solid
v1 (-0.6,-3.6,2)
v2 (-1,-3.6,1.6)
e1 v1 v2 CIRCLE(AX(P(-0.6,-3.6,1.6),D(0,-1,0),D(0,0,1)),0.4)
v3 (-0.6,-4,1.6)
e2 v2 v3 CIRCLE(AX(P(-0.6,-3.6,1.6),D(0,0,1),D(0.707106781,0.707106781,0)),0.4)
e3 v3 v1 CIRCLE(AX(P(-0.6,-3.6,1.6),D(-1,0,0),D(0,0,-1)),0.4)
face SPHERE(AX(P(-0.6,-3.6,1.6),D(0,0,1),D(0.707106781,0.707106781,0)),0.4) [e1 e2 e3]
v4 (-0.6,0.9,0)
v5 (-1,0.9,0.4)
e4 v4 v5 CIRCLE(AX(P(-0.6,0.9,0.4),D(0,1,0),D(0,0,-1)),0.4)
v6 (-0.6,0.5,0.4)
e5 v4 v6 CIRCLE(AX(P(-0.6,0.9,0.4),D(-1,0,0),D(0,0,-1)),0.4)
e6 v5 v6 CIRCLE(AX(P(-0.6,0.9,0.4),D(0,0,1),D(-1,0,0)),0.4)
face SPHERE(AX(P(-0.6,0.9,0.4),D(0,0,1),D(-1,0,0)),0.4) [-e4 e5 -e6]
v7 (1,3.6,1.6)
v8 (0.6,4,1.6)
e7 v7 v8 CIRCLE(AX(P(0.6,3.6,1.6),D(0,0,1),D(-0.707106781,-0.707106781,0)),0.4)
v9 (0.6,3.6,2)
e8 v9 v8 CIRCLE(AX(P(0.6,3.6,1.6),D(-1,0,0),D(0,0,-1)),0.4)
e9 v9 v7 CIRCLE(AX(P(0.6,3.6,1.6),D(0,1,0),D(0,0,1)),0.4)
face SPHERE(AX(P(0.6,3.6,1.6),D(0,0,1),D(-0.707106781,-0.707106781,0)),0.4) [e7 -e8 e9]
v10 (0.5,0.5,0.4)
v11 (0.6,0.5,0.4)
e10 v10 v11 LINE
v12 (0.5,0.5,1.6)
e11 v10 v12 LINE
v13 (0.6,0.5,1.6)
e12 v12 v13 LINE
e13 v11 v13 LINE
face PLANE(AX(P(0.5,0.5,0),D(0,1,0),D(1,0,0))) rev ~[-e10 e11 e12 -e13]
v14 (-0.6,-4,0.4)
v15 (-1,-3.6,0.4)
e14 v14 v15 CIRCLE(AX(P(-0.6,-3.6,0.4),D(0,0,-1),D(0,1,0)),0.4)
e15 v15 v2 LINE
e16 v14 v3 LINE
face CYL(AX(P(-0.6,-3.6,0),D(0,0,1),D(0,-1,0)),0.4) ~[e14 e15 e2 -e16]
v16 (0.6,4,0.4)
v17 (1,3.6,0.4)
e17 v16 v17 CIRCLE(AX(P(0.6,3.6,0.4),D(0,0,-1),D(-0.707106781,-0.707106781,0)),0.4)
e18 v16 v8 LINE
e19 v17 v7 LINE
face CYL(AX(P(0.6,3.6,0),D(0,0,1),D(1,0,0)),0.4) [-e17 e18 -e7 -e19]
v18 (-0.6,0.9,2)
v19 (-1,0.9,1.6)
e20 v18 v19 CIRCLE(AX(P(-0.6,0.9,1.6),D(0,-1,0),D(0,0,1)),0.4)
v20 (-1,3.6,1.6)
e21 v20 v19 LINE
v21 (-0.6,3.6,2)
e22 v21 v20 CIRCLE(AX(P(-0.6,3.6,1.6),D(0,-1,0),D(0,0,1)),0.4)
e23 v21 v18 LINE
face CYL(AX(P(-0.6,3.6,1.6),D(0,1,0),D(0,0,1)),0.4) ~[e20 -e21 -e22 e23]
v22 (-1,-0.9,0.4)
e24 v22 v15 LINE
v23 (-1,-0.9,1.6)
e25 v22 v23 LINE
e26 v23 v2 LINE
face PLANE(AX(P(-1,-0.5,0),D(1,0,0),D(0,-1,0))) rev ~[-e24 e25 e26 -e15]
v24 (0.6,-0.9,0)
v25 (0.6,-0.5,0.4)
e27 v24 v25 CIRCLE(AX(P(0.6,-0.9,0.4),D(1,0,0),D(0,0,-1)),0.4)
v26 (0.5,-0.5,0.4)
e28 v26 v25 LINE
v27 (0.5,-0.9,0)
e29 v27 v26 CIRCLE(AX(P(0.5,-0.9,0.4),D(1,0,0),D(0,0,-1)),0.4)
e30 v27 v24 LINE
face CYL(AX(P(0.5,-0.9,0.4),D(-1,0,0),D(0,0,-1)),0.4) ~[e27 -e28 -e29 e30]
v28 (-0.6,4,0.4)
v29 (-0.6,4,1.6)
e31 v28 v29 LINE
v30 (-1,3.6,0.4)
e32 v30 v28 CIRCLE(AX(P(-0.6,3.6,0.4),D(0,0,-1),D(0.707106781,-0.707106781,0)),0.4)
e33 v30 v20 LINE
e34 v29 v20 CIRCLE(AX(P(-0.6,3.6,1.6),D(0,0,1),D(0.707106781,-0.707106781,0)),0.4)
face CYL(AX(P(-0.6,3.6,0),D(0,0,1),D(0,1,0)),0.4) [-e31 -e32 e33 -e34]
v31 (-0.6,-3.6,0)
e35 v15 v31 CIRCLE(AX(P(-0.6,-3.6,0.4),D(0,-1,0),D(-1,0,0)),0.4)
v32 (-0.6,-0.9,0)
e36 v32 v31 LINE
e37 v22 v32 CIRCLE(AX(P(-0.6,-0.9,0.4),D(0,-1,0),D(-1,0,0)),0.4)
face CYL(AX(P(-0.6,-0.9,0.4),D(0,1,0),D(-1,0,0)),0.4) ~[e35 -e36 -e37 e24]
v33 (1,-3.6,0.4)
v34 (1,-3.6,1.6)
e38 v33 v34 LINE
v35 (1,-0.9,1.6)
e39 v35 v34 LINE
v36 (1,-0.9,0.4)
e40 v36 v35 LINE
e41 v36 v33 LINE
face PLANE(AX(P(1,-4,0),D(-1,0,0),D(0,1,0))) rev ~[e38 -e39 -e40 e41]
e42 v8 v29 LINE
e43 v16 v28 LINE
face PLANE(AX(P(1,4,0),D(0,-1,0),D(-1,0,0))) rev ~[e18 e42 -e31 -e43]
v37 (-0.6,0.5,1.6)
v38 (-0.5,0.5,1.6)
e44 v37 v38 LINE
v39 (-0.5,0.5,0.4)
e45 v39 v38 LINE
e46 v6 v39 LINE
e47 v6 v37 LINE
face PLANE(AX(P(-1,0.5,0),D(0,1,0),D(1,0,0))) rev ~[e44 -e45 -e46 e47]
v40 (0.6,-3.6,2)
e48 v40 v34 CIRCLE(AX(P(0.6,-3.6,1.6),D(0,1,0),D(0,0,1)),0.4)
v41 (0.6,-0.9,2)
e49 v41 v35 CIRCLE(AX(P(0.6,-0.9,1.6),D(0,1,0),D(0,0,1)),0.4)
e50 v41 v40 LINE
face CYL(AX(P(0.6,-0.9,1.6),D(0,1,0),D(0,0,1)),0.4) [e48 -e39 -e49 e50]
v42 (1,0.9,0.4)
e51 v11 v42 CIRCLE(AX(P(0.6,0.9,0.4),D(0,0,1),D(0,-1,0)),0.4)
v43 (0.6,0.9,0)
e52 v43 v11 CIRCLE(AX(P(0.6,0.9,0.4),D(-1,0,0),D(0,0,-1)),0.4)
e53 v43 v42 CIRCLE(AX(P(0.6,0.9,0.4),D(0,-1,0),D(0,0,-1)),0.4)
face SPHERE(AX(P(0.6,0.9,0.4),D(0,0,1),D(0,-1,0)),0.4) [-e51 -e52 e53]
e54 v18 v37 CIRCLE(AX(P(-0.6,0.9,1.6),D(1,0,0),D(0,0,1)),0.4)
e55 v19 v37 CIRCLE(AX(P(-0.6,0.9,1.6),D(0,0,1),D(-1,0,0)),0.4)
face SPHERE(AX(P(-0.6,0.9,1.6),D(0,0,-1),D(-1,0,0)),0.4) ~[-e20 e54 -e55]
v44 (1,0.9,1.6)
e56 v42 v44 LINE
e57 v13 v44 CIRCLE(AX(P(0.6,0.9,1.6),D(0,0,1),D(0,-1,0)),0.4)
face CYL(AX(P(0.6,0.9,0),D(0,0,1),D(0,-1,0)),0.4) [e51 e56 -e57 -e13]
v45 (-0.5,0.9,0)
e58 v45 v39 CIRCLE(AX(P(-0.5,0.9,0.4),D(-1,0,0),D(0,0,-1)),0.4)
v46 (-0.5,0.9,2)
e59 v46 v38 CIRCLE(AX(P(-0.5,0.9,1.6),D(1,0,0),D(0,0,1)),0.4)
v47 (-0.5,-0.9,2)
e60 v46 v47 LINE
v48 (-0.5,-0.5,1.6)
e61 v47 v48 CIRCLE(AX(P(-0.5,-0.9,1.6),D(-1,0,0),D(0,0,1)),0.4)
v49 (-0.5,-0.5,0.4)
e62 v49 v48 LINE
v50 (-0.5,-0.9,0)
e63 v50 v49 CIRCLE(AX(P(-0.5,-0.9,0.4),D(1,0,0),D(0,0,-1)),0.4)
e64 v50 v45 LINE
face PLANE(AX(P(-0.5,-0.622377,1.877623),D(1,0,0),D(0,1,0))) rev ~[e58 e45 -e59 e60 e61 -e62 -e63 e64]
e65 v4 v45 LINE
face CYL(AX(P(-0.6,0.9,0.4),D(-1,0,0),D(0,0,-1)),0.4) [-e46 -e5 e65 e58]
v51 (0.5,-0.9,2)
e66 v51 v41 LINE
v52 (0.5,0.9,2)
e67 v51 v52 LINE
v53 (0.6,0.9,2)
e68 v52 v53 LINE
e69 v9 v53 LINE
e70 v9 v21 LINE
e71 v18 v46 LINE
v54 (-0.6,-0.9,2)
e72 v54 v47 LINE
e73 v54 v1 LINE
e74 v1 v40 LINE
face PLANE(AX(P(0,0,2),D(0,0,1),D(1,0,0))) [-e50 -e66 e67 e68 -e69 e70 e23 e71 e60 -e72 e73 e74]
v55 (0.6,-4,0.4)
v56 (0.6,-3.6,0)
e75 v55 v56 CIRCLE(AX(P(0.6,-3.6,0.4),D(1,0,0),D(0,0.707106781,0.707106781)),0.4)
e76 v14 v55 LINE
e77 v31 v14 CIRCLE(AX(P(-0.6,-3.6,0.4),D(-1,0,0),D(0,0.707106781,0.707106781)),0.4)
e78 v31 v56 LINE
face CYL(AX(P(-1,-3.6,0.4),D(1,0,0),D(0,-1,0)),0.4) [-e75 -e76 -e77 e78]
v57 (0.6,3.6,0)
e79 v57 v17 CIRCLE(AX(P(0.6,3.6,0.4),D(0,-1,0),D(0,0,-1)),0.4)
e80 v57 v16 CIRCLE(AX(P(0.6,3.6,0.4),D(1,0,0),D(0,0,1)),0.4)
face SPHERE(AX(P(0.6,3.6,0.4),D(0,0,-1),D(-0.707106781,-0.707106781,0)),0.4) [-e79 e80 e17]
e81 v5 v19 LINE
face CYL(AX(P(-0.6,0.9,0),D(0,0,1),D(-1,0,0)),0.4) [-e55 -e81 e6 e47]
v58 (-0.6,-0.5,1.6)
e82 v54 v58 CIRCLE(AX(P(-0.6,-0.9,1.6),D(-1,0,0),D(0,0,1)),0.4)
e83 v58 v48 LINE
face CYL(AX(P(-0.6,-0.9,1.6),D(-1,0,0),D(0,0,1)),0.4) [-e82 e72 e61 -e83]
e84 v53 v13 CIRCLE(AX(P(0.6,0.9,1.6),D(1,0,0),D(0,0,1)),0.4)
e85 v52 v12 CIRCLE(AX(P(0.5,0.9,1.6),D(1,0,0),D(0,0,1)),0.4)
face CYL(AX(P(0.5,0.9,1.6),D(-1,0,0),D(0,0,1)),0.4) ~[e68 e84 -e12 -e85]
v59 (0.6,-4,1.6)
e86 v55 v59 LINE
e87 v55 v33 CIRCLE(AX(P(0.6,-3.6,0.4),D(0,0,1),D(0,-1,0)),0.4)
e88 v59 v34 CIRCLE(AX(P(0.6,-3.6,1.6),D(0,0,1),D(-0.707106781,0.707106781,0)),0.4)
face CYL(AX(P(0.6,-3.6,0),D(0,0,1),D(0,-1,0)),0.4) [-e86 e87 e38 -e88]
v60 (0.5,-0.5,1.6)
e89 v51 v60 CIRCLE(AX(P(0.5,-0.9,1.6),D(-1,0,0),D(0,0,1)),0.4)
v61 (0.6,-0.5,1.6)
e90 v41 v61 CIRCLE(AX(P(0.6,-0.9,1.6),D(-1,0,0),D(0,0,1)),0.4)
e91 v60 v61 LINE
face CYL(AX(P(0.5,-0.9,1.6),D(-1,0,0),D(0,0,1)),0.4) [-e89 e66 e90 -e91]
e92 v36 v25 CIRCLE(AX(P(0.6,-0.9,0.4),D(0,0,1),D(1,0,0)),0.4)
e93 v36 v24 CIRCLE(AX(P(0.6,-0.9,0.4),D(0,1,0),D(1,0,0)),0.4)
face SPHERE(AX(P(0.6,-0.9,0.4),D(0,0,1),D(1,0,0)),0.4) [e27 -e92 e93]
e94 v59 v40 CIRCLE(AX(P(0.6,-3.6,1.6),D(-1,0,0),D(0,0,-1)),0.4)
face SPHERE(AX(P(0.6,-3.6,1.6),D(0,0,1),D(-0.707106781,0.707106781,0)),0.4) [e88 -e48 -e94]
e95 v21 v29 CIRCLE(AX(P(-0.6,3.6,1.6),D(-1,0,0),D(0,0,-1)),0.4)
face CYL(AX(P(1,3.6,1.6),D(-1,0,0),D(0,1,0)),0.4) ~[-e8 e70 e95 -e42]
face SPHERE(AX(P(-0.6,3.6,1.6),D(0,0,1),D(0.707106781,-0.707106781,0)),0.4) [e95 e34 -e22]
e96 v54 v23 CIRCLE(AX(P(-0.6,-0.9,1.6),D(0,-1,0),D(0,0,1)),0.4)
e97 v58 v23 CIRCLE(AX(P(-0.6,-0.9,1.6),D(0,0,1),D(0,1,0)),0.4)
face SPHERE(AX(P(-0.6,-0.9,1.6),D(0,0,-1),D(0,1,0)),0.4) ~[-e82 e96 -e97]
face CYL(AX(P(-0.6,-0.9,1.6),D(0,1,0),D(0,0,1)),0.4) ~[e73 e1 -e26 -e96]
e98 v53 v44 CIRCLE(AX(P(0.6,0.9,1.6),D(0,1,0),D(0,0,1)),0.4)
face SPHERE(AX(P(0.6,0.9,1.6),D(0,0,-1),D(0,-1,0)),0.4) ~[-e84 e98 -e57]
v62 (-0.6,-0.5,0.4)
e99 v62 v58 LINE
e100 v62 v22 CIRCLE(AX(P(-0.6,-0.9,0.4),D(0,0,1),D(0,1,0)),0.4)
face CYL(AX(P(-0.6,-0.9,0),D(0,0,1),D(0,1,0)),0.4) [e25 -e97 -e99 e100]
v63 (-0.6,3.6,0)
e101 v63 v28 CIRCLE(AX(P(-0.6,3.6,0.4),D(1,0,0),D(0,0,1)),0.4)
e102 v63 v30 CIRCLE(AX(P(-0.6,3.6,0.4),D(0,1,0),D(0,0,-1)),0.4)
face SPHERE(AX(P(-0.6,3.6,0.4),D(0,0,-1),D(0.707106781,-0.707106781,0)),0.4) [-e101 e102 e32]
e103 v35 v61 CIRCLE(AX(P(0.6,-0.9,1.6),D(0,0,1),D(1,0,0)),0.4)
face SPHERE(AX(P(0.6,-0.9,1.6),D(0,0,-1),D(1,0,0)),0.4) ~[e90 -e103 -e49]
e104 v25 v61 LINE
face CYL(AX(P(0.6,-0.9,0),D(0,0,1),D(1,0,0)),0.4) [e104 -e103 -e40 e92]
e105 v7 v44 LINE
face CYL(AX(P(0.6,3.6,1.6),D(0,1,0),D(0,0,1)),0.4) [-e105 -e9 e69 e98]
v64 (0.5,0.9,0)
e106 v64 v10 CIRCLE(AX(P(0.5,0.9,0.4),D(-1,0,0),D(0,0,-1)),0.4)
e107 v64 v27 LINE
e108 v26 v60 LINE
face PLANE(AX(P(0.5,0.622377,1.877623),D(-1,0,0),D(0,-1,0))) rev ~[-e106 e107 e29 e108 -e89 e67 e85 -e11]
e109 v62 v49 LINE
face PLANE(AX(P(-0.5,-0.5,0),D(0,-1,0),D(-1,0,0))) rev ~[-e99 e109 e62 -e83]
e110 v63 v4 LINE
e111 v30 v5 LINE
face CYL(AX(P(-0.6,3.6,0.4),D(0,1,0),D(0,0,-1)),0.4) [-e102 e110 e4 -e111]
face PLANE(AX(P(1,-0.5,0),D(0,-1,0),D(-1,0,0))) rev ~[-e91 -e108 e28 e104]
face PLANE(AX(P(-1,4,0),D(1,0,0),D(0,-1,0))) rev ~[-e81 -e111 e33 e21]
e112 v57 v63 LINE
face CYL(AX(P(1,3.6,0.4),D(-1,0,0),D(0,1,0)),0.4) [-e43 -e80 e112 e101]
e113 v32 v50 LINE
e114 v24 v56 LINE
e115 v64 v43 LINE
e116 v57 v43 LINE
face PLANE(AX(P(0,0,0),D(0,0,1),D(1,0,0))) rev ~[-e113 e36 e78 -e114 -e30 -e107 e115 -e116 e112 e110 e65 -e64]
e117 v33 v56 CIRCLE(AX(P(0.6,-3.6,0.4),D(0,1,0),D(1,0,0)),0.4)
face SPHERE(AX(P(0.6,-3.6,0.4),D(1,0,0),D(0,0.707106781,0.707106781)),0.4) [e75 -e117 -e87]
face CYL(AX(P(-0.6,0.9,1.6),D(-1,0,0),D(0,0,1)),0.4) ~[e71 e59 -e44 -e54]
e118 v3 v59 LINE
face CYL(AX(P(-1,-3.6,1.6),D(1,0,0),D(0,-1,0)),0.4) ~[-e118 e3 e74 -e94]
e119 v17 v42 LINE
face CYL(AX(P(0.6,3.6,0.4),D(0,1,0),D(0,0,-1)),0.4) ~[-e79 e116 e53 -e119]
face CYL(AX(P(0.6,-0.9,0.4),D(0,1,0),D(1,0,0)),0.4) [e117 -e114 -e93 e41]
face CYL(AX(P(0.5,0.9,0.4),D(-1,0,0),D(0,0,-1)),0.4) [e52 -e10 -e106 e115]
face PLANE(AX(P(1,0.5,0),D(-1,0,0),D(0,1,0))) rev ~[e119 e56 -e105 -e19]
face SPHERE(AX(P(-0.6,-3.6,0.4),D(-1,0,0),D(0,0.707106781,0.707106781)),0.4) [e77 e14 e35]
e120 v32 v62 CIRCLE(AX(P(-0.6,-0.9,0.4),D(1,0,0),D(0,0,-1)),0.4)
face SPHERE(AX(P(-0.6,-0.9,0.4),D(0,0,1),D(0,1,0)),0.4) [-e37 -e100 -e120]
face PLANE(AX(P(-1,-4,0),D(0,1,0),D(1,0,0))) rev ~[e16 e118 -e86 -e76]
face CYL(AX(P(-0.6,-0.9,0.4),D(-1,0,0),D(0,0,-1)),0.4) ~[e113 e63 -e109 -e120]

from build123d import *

# Parameters (mm, degrees)
F1_DEPTH     = 2
F2_R         = 0.4
F3_T1_DEPTH  = 2.7
F3_T3_DEPTH  = 2.7
F3_T5_DEPTH  = 0.1
F3_T7_DEPTH  = 0.1
F3_S11_W     = 0.4
F3_S11_H     = 0.4
F3_T12_DEPTH = 0.4
F3_S17_W     = 0.4
F3_S17_H     = 0.4
F3_T18_DEPTH = 0.4
F3_S23_W     = 0.4
F3_S23_H     = 0.4
F3_T24_DEPTH = 0.4
F3_S29_W     = 0.4
F3_S29_H     = 0.4
F3_T30_DEPTH = 0.4
F3_S35_W     = 0.4
F3_S35_H     = 0.4
F3_T36_DEPTH = 0.4
F3_S41_W     = 0.4
F3_S41_H     = 0.4
F3_T42_DEPTH = 0.4
F3_S47_W     = 0.4
F3_S47_H     = 0.4
F3_T48_DEPTH = 0.4
F3_S53_W     = 0.4
F3_S53_H     = 0.4
F3_T54_DEPTH = 0.4
F3_T58_ANGLE = 90
F3_T60_ANGLE = 90
F3_T62_ANGLE = 90
F3_T64_ANGLE = 90
F3_T66_ANGLE = 90
F3_T68_ANGLE = 90
F3_T70_ANGLE = 90
F3_T72_ANGLE = 90


# Not quite as in the source:
# - a fillet or chamfer that OpenCascade refuses, or shapes differently, is made with other operations: its cross-section is extruded or revolved along the edge and cut away or added


with BuildPart() as f1:
    # F0 (on Top) → F1 (new body)
    with BuildSketch(Plane.XY):
        Polygon((-1, -4), (1, -4), (1, -0.5), (0.5, -0.5), (0.5, 0.5), (1, 0.5), (1, 4), (-1, 4), (-1, 0.5), (-0.5, 0.5), (-0.5, -0.5), (-1, -0.5), align=None)
    extrude(amount=F1_DEPTH)

    # F2
    f2_edges = [f1.edges().sort_by_distance(p)[0] for p in [
        (0, -4, 2),
        (1, -4, 1),
        (-1, -4, 1),
        (0, -4, 0),
        (1, 4, 1),
        (0, 4, 2),
        (-1, 4, 1),
        (0, 4, 0),
        (1, 0.5, 1),
        (1, -0.5, 1),
        (-1, 0.5, 1),
        (-1, -0.5, 1),
    ]]
    fillet(f2_edges, radius=F2_R)

    # F3: fillet of radius 0.4 on 8 edges, made by hand

    # F3_s2 → F3_t1 (cut)
    with BuildSketch(Plane.XZ.offset(0.9)):
        with BuildLine():
            ThreePointArc((0.6, 2), (0.8828427125, 1.8828427125), (1, 1.6))
            Line((1, 1.6), (1, 2))
            Line((1, 2), (0.6, 2))
        make_face()
        with BuildLine():
            ThreePointArc((1, 0.4), (0.8828427125, 0.1171572875), (0.6, 0))
            Line((0.6, 0), (1, 0))
            Line((1, 0), (1, 0.4))
        make_face()
        with BuildLine():
            ThreePointArc((-0.6, 2), (-0.8828427125, 1.8828427125), (-1, 1.6))
            Line((-1, 1.6), (-1, 2))
            Line((-1, 2), (-0.6, 2))
        make_face()
        with BuildLine():
            ThreePointArc((-1, 0.4), (-0.8828427125, 0.1171572875), (-0.6, 0))
            Line((-0.6, 0), (-1, 0))
            Line((-1, 0), (-1, 0.4))
        make_face()
    extrude(amount=F3_T1_DEPTH, mode=Mode.SUBTRACT)

    # F3_s4 → F3_t3 (cut)
    with BuildSketch(Plane.XZ.offset(-3.6)):
        with BuildLine():
            ThreePointArc((0.6, 2), (0.8828427125, 1.8828427125), (1, 1.6))
            Line((1, 1.6), (1, 2))
            Line((1, 2), (0.6, 2))
        make_face()
        with BuildLine():
            ThreePointArc((0.6, 0), (0.8828427125, 0.1171572875), (1, 0.4))
            Line((1, 0.4), (1, 0))
            Line((1, 0), (0.6, 0))
        make_face()
        with BuildLine():
            ThreePointArc((-0.6, 2), (-0.8828427125, 1.8828427125), (-1, 1.6))
            Line((-1, 1.6), (-1, 2))
            Line((-1, 2), (-0.6, 2))
        make_face()
        with BuildLine():
            ThreePointArc((-0.6, 0), (-0.8828427125, 0.1171572875), (-1, 0.4))
            Line((-1, 0.4), (-1, 0))
            Line((-1, 0), (-0.6, 0))
        make_face()
    extrude(amount=F3_T3_DEPTH, mode=Mode.SUBTRACT)

    # F3_s6 → F3_t5 (cut)
    with BuildSketch(Plane.YZ.offset(-0.6)):
        with BuildLine():
            ThreePointArc((0.9, 0), (0.6171572875, 0.1171572875), (0.5, 0.4))
            Line((0.5, 0.4), (0.5, 0))
            Line((0.5, 0), (0.9, 0))
        make_face()
        with BuildLine():
            ThreePointArc((-0.9, 0), (-0.6171572875, 0.1171572875), (-0.5, 0.4))
            Line((-0.5, 0.4), (-0.5, 0))
            Line((-0.5, 0), (-0.9, 0))
        make_face()
        with BuildLine():
            ThreePointArc((0.9, 2), (0.6171572875, 1.8828427125), (0.5, 1.6))
            Line((0.5, 1.6), (0.5, 2))
            Line((0.5, 2), (0.9, 2))
        make_face()
        with BuildLine():
            ThreePointArc((-0.9, 2), (-0.6171572875, 1.8828427125), (-0.5, 1.6))
            Line((-0.5, 1.6), (-0.5, 2))
            Line((-0.5, 2), (-0.9, 2))
        make_face()
    extrude(amount=F3_T5_DEPTH, mode=Mode.SUBTRACT)

    # F3_s8 → F3_t7 (cut)
    with BuildSketch(Plane.YZ.offset(0.5)):
        with BuildLine():
            ThreePointArc((0.9, 0), (0.6171572875, 0.1171572875), (0.5, 0.4))
            Line((0.5, 0.4), (0.5, 0))
            Line((0.5, 0), (0.9, 0))
        make_face()
        with BuildLine():
            ThreePointArc((0.9, 2), (0.6171572875, 1.8828427125), (0.5, 1.6))
            Line((0.5, 1.6), (0.5, 2))
            Line((0.5, 2), (0.9, 2))
        make_face()
        with BuildLine():
            ThreePointArc((-0.9, 0), (-0.6171572875, 0.1171572875), (-0.5, 0.4))
            Line((-0.5, 0.4), (-0.5, 0))
            Line((-0.5, 0), (-0.9, 0))
        make_face()
        with BuildLine():
            ThreePointArc((-0.9, 2), (-0.6171572875, 1.8828427125), (-0.5, 1.6))
            Line((-0.5, 1.6), (-0.5, 2))
            Line((-0.5, 2), (-0.9, 2))
        make_face()
    extrude(amount=F3_T7_DEPTH, mode=Mode.SUBTRACT)


with BuildPart() as f3_tool10:
    # F3_s11 → F3_t12 (new body)
    with BuildSketch(Plane.XY.offset(0.4)):
        with Locations((-0.8, 3.8)):
            Rectangle(F3_S11_W, F3_S11_H)
    extrude(amount=-F3_T12_DEPTH)

    # F3_s13 → F3_t14 (revolve, cut)
    with BuildSketch(Plane(origin=(-0.6, 3.6, 0.4), x_dir=(0.7071067812, -0.7071067812, 0), z_dir=(0.7071067812, 0.7071067812, 0))):
        with BuildLine():
            ThreePointArc((0, -0.4), (0.4, 0), (0, 0.4))
            Line((0, 0.4), (0, -0.4))
        make_face()
    revolve(axis=Axis((-0.6, 3.6, 0.4), (0, 0, -1)), mode=Mode.SUBTRACT)


with BuildPart() as f1_1:
    add(f1.part)

    # F3_t9: cut F3_tool10
    add(f3_tool10.part, mode=Mode.SUBTRACT)


with BuildPart() as f3_tool16:
    # F3_s17 → F3_t18 (new body)
    with BuildSketch(Plane.YZ.offset(-0.6)):
        with Locations((-3.8, 0.2)):
            Rectangle(F3_S17_W, F3_S17_H)
    extrude(amount=-F3_T18_DEPTH)

    # F3_s19 → F3_t20 (revolve, cut)
    with BuildSketch(Plane(origin=(-0.6, -3.6, 0.4), x_dir=(0, 0.7071067812, 0.7071067812), z_dir=(0, -0.7071067812, 0.7071067812))):
        with BuildLine():
            ThreePointArc((0, -0.4), (0.4, 0), (0, 0.4))
            Line((0, 0.4), (0, -0.4))
        make_face()
    revolve(axis=Axis((-0.6, -3.6, 0.4), (-1, 0, 0)), mode=Mode.SUBTRACT)


with BuildPart() as f1_2:
    add(f1_1.part)

    # F3_t15: cut F3_tool16
    add(f3_tool16.part, mode=Mode.SUBTRACT)


with BuildPart() as f3_tool22:
    # F3_s23 → F3_t24 (new body)
    with BuildSketch(Plane.XY.offset(1.6)):
        with Locations((-0.8, 3.8)):
            Rectangle(F3_S23_W, F3_S23_H)
    extrude(amount=F3_T24_DEPTH)

    # F3_s25 → F3_t26 (revolve, cut)
    with BuildSketch(Plane(origin=(-0.6, 3.6, 1.6), x_dir=(0.7071067812, -0.7071067812, 0), z_dir=(-0.7071067812, -0.7071067812, 0))):
        with BuildLine():
            ThreePointArc((0, -0.4), (0.4, 0), (0, 0.4))
            Line((0, 0.4), (0, -0.4))
        make_face()
    revolve(axis=Axis((-0.6, 3.6, 1.6), (0, 0, 1)), mode=Mode.SUBTRACT)


with BuildPart() as f1_3:
    add(f1_2.part)

    # F3_t21: cut F3_tool22
    add(f3_tool22.part, mode=Mode.SUBTRACT)


with BuildPart() as f3_tool28:
    # F3_s29 → F3_t30 (new body)
    with BuildSketch(Plane.XY.offset(1.6)):
        with Locations((-0.8, -3.8)):
            Rectangle(F3_S29_W, F3_S29_H)
    extrude(amount=F3_T30_DEPTH)

    # F3_s31 → F3_t32 (revolve, cut)
    with BuildSketch(Plane(origin=(-0.6, -3.6, 1.6), x_dir=(0.7071067812, 0.7071067812, 0), z_dir=(0.7071067812, -0.7071067812, 0))):
        with BuildLine():
            ThreePointArc((0, -0.4), (0.4, 0), (0, 0.4))
            Line((0, 0.4), (0, -0.4))
        make_face()
    revolve(axis=Axis((-0.6, -3.6, 1.6), (0, 0, 1)), mode=Mode.SUBTRACT)


with BuildPart() as f1_4:
    add(f1_3.part)

    # F3_t27: cut F3_tool28
    add(f3_tool28.part, mode=Mode.SUBTRACT)


with BuildPart() as f3_tool34:
    # F3_s35 → F3_t36 (new body)
    with BuildSketch(Plane.XY.offset(0.4)):
        with Locations((0.8, 3.8)):
            Rectangle(F3_S35_W, F3_S35_H)
    extrude(amount=-F3_T36_DEPTH)

    # F3_s37 → F3_t38 (revolve, cut)
    with BuildSketch(Plane(origin=(0.6, 3.6, 0.4), x_dir=(-0.7071067812, -0.7071067812, 0), z_dir=(0.7071067812, -0.7071067812, 0))):
        with BuildLine():
            ThreePointArc((0, -0.4), (0.4, 0), (0, 0.4))
            Line((0, 0.4), (0, -0.4))
        make_face()
    revolve(axis=Axis((0.6, 3.6, 0.4), (0, 0, -1)), mode=Mode.SUBTRACT)


with BuildPart() as f1_5:
    add(f1_4.part)

    # F3_t33: cut F3_tool34
    add(f3_tool34.part, mode=Mode.SUBTRACT)


with BuildPart() as f3_tool40:
    # F3_s41 → F3_t42 (new body)
    with BuildSketch(Plane.XY.offset(1.6)):
        with Locations((0.8, 3.8)):
            Rectangle(F3_S41_W, F3_S41_H)
    extrude(amount=F3_T42_DEPTH)

    # F3_s43 → F3_t44 (revolve, cut)
    with BuildSketch(Plane(origin=(0.6, 3.6, 1.6), x_dir=(-0.7071067812, -0.7071067812, 0), z_dir=(-0.7071067812, 0.7071067812, 0))):
        with BuildLine():
            ThreePointArc((0, -0.4), (0.4, 0), (0, 0.4))
            Line((0, 0.4), (0, -0.4))
        make_face()
    revolve(axis=Axis((0.6, 3.6, 1.6), (0, 0, 1)), mode=Mode.SUBTRACT)


with BuildPart() as f1_6:
    add(f1_5.part)

    # F3_t39: cut F3_tool40
    add(f3_tool40.part, mode=Mode.SUBTRACT)


with BuildPart() as f3_tool46:
    # F3_s47 → F3_t48 (new body)
    with BuildSketch(Plane.YZ.offset(0.6)):
        with Locations((-3.8, 0.2)):
            Rectangle(F3_S47_W, F3_S47_H)
    extrude(amount=F3_T48_DEPTH)

    # F3_s49 → F3_t50 (revolve, cut)
    with BuildSketch(Plane(origin=(0.6, -3.6, 0.4), x_dir=(0, 0.7071067812, 0.7071067812), z_dir=(0, 0.7071067812, -0.7071067812))):
        with BuildLine():
            ThreePointArc((0, -0.4), (0.4, 0), (0, 0.4))
            Line((0, 0.4), (0, -0.4))
        make_face()
    revolve(axis=Axis((0.6, -3.6, 0.4), (1, 0, 0)), mode=Mode.SUBTRACT)


with BuildPart() as f1_7:
    add(f1_6.part)

    # F3_t45: cut F3_tool46
    add(f3_tool46.part, mode=Mode.SUBTRACT)


with BuildPart() as f3_tool52:
    # F3_s53 → F3_t54 (new body)
    with BuildSketch(Plane.XY.offset(1.6)):
        with Locations((0.8, -3.8)):
            Rectangle(F3_S53_W, F3_S53_H)
    extrude(amount=F3_T54_DEPTH)

    # F3_s55 → F3_t56 (revolve, cut)
    with BuildSketch(Plane(origin=(0.6, -3.6, 1.6), x_dir=(-0.7071067812, 0.7071067812, 0), z_dir=(0.7071067812, 0.7071067812, 0))):
        with BuildLine():
            ThreePointArc((0, -0.4), (0.4, 0), (0, 0.4))
            Line((0, 0.4), (0, -0.4))
        make_face()
    revolve(axis=Axis((0.6, -3.6, 1.6), (0, 0, 1)), mode=Mode.SUBTRACT)


with BuildPart() as f1_8:
    add(f1_7.part)

    # F3_t51: cut F3_tool52
    add(f3_tool52.part, mode=Mode.SUBTRACT)

    # F3_s57 → F3_t58 (revolve, cut)
    with BuildSketch(Plane.XZ.offset(-0.9)):
        with BuildLine():
            ThreePointArc((-0.6, 0), (-0.8828427125, 0.1171572875), (-1, 0.4))
            Line((-1, 0.4), (-1, 0))
            Line((-1, 0), (-0.6, 0))
        make_face()
    revolve(axis=Axis((-0.6, 0.9, 0), (0, 0, 1)), revolution_arc=F3_T58_ANGLE, mode=Mode.SUBTRACT)

    # F3_s59 → F3_t60 (revolve, cut)
    with BuildSketch(Plane.YZ.offset(-0.6)):
        with BuildLine():
            ThreePointArc((-0.9, 0), (-0.6171572875, 0.1171572875), (-0.5, 0.4))
            Line((-0.5, 0.4), (-0.5, 0))
            Line((-0.5, 0), (-0.9, 0))
        make_face()
    revolve(axis=Axis((-0.6, -0.9, 0), (0, 0, 1)), revolution_arc=F3_T60_ANGLE, mode=Mode.SUBTRACT)

    # F3_s61 → F3_t62 (revolve, cut)
    with BuildSketch(Plane.XZ.offset(-0.9)):
        with BuildLine():
            ThreePointArc((-0.6, 2), (-0.8828427125, 1.8828427125), (-1, 1.6))
            Line((-1, 1.6), (-1, 2))
            Line((-1, 2), (-0.6, 2))
        make_face()
    revolve(axis=Axis((-0.6, 0.9, 2), (0, 0, 1)), revolution_arc=F3_T62_ANGLE, mode=Mode.SUBTRACT)

    # F3_s63 → F3_t64 (revolve, cut)
    with BuildSketch(Plane.YZ.offset(-0.6)):
        with BuildLine():
            ThreePointArc((-0.9, 2), (-0.6171572875, 1.8828427125), (-0.5, 1.6))
            Line((-0.5, 1.6), (-0.5, 2))
            Line((-0.5, 2), (-0.9, 2))
        make_face()
    revolve(axis=Axis((-0.6, -0.9, 2), (0, 0, 1)), revolution_arc=F3_T64_ANGLE, mode=Mode.SUBTRACT)

    # F3_s65 → F3_t66 (revolve, cut)
    with BuildSketch(Plane.YZ.offset(0.6)):
        with BuildLine():
            ThreePointArc((0.9, 0), (0.6171572875, 0.1171572875), (0.5, 0.4))
            Line((0.5, 0.4), (0.5, 0))
            Line((0.5, 0), (0.9, 0))
        make_face()
    revolve(axis=Axis((0.6, 0.9, 0), (0, 0, 1)), revolution_arc=F3_T66_ANGLE, mode=Mode.SUBTRACT)

    # F3_s67 → F3_t68 (revolve, cut)
    with BuildSketch(Plane.YZ.offset(0.6)):
        with BuildLine():
            ThreePointArc((0.9, 2), (0.6171572875, 1.8828427125), (0.5, 1.6))
            Line((0.5, 1.6), (0.5, 2))
            Line((0.5, 2), (0.9, 2))
        make_face()
    revolve(axis=Axis((0.6, 0.9, 2), (0, 0, 1)), revolution_arc=F3_T68_ANGLE, mode=Mode.SUBTRACT)

    # F3_s69 → F3_t70 (revolve, cut)
    with BuildSketch(Plane.XZ.offset(0.9)):
        with BuildLine():
            ThreePointArc((0.6, 0), (0.8828427125, 0.1171572875), (1, 0.4))
            Line((1, 0.4), (1, 0))
            Line((1, 0), (0.6, 0))
        make_face()
    revolve(axis=Axis((0.6, -0.9, 0), (0, 0, 1)), revolution_arc=F3_T70_ANGLE, mode=Mode.SUBTRACT)

    # F3_s71 → F3_t72 (revolve, cut)
    with BuildSketch(Plane.XZ.offset(0.9)):
        with BuildLine():
            ThreePointArc((0.6, 2), (0.8828427125, 1.8828427125), (1, 1.6))
            Line((1, 1.6), (1, 2))
            Line((1, 2), (0.6, 2))
        make_face()
    revolve(axis=Axis((0.6, -0.9, 2), (0, 0, 1)), revolution_arc=F3_T72_ANGLE, mode=Mode.SUBTRACT)


solid = f1_8.part
